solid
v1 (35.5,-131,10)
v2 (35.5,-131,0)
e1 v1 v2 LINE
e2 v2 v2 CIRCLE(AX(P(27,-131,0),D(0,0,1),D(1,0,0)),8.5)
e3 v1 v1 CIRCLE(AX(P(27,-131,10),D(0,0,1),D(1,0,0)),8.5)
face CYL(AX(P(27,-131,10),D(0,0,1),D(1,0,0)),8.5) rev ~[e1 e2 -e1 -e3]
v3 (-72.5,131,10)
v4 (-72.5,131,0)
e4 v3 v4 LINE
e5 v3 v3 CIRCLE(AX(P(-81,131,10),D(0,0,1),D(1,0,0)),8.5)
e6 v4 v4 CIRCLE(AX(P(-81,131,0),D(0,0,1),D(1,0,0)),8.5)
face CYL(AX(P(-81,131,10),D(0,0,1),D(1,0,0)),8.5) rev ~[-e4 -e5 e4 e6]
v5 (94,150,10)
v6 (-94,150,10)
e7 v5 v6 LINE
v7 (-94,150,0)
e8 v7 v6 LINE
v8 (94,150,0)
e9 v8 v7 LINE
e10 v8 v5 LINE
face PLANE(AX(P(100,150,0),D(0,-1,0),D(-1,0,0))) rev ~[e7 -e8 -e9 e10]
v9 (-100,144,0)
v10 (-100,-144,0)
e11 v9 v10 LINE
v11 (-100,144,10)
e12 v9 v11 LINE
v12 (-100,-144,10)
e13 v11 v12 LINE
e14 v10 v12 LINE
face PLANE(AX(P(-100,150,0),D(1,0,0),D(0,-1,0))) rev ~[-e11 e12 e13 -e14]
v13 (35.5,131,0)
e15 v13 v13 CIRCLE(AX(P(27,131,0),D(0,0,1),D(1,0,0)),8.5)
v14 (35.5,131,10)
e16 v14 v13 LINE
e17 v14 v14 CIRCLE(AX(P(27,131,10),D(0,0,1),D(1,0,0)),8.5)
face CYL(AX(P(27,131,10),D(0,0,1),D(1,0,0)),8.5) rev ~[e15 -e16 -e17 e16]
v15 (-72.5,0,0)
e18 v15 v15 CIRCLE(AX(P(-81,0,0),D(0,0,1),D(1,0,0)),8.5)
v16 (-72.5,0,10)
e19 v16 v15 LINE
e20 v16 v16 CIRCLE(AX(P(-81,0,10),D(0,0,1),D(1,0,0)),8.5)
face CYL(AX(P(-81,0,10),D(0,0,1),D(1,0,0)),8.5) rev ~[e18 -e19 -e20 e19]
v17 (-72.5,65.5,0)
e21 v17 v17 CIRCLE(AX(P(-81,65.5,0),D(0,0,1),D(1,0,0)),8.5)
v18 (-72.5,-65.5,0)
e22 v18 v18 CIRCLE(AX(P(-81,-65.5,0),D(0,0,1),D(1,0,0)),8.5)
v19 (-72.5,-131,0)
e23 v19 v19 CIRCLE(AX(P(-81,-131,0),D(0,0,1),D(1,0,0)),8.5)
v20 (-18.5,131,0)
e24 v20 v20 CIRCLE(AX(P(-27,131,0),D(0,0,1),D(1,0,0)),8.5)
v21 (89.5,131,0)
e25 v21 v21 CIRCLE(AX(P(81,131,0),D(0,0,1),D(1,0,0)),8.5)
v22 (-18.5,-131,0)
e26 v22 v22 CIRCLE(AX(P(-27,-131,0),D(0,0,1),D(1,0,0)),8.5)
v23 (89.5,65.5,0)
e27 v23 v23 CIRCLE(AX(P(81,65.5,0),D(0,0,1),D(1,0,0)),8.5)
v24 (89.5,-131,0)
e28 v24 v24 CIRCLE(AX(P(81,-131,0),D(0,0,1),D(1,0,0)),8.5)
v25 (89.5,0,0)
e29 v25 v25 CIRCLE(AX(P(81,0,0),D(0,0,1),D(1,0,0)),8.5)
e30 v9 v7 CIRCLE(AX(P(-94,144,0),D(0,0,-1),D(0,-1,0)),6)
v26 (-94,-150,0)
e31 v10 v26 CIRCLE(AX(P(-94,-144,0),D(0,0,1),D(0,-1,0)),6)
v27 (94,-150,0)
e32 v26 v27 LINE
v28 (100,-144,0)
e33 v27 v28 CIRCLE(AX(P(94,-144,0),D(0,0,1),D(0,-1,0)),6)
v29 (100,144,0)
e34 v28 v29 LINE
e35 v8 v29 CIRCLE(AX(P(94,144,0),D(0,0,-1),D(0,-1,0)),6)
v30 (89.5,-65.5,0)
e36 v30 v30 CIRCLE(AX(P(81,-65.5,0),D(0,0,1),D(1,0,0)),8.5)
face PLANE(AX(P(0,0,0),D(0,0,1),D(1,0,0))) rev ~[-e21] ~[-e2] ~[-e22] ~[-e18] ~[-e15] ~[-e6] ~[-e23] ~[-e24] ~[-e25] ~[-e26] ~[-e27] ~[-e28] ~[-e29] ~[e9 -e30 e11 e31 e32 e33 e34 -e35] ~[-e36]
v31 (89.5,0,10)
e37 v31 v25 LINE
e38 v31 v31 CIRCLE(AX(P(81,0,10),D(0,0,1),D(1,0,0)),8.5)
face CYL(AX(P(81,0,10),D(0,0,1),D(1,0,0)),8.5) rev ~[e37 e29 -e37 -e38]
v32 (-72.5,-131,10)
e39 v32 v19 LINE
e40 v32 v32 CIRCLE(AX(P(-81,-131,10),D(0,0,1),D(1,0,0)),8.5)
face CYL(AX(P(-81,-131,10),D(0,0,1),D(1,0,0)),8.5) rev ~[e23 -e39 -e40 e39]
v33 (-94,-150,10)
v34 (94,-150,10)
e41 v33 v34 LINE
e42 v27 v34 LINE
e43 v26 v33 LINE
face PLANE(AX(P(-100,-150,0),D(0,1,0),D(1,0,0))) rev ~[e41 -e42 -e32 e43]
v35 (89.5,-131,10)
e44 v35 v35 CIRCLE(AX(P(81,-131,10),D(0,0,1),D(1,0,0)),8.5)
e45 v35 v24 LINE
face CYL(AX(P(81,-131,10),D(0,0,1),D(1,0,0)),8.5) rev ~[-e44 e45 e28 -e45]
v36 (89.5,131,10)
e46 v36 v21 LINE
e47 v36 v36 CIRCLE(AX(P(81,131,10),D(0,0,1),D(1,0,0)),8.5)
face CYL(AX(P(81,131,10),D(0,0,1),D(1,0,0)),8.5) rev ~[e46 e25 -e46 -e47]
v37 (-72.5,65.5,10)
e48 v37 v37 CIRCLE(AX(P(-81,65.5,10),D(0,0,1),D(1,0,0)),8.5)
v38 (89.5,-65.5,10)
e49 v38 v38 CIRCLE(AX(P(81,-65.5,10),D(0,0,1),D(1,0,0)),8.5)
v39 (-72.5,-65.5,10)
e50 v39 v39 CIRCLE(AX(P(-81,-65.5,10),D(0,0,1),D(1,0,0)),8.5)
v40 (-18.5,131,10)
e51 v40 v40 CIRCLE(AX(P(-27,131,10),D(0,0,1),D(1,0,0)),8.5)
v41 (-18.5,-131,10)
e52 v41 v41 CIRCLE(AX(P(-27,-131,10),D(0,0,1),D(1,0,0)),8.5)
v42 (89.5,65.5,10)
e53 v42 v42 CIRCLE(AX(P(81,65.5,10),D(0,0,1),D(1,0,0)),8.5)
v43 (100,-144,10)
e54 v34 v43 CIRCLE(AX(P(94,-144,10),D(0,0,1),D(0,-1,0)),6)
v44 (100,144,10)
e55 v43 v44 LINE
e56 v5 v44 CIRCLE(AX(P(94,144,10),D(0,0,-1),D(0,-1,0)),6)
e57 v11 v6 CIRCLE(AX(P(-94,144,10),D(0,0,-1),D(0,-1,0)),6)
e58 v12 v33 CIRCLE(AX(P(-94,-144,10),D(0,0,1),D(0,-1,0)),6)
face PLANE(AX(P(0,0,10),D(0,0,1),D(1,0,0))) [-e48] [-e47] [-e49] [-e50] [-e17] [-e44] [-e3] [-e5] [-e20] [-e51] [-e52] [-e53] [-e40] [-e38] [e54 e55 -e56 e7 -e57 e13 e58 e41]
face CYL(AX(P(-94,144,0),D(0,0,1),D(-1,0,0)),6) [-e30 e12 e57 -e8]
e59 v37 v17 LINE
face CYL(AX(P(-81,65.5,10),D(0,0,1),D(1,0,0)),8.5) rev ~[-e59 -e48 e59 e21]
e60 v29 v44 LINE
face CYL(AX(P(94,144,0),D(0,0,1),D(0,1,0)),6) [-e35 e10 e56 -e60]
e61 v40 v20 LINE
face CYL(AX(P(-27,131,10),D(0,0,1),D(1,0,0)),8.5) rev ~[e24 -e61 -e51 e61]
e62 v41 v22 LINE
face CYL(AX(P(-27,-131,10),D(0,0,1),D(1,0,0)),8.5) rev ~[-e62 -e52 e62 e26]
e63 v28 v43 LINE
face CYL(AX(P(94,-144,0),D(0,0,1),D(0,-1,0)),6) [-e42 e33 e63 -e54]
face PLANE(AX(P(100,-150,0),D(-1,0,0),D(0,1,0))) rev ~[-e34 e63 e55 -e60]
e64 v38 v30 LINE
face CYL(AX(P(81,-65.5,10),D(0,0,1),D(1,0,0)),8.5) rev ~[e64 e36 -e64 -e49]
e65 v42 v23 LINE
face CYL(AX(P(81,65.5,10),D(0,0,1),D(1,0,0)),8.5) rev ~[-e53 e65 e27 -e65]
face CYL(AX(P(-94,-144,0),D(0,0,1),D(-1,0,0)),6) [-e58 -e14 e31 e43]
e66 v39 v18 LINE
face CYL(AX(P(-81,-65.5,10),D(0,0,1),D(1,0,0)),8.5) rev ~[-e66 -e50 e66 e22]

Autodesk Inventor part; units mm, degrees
ref_plane "YZ Plane" through (0, 0, 0) normal (1, 0, 0) x (0, 1, 0)
ref_plane "XZ Plane" through (0, 0, 0) normal (0, 1, 0) x (-1, 0, 0)
ref_plane "XY Plane" through (0, 0, 0) normal (0, 0, 1) x (1, 0, 0)
sketch "Sketch2" plane through (0, 0, 0) normal (0, 0, 1) x (1, 0, 0)
  line L0 (-50, -100) -> (50, -100)
  line L1 (50, -100) -> (50, 100)
  line L2 (50, 100) -> (-50, 100)
  line L3 (-50, 100) -> (-50, -100)
  line L4 (-50, -100) -> (50, 100) construction
  line L5 (50, -100) -> (-50, 100) construction
  line L6 (-100, -150) -> (100, -150)
  line L7 (100, -150) -> (100, 150)
  line L8 (100, 150) -> (-100, 150)
  line L9 (-100, 150) -> (-100, -150)
  point P0 (0, 0)
  dimension "d29" = 100
  dimension "d30" = 200
  dimension "d31" = 50
extrude "Plate2" add sketch "Sketch2" along normal blind 10 contours L3 L2 L1 L0 | L9 L8 L7 L6
sketch "Sketch5" plane through (0, 0, 10) normal (0, 0, 1) x (1, 0, 0)
  line L0 (100, -150) -> (-100, -150) construction
  line L1 (100, 150) -> (100, -150) construction
  line L2 (-100, 150) -> (100, 150) construction
  line L3 (-100, -150) -> (-100, 150) construction
  line L4 (-81, 131) -> (81, 131) construction
  line L5 (81, 131) -> (81, -131) construction
  line L6 (81, -131) -> (-81, -131) construction
  line L7 (-81, -131) -> (-81, 131) construction
  circle A0 centre (-81, -131) radius 8.5
  circle A1 centre (-81, 131) radius 8.5
  circle A2 centre (-81, 0) radius 8.5
  circle A3 centre (-81, -65.5) radius 8.5
  circle A4 centre (-81, 65.5) radius 8.5
  line L8 (-50, 0) -> (50, 0) construction
  circle A5 centre (-27, -131) radius 8.5
  circle A6 centre (-27, -65.5) radius 8.5
  circle A7 centre (-27, 0) radius 8.5
  circle A8 centre (-27, 65.5) radius 8.5
  circle A9 centre (-27, 131) radius 8.5
  circle A10 centre (27, -131) radius 8.5
  circle A11 centre (27, -65.5) radius 8.5
  circle A12 centre (27, 0) radius 8.5
  circle A13 centre (27, 65.5) radius 8.5
  circle A14 centre (27, 131) radius 8.5
  circle A15 centre (81, -131) radius 8.5
  circle A16 centre (81, -65.5) radius 8.5
  circle A17 centre (81, 0) radius 8.5
  circle A18 centre (81, 65.5) radius 8.5
  circle A19 centre (81, 131) radius 8.5
  point P0 (0, 0)
  point P1 (0, -131)
  dimension "d33" = 17
  dimension "d34" = 19
  dimension "d35" = 65.5
  dimension "d36" = 65.5
  dimension "d39" = 54
extrude "Cut3" cut sketch "Sketch5" against normal blind 10 contours A0 | A1 | A2 | A3 | A4 | A5 | A9 | A10 | A14 | A15 | A16 | A17 | A18 | A19
fillet "Corner Round1" radius 6 4 edges at (-100, -150, 5) (-100, 150, 5) (100, 150, 5) (100, -150, 5)
equation "\"d35\" = d36"
equation "\"d44\" = Thickness"
equation "\"d14\" = Thickness"
equation "\"BendReliefDepth\" = 0.5 * Thickness"
equation "\"TransitionRadius\" = BendRadius"
equation "\"JacobiRadiusSize\" = BendRadius"
equation "\"Thickness\" = 10"
equation "\"BendRadius\" = 6"
properties part number "SLM 1607 charging flange rect" material "Steel"
